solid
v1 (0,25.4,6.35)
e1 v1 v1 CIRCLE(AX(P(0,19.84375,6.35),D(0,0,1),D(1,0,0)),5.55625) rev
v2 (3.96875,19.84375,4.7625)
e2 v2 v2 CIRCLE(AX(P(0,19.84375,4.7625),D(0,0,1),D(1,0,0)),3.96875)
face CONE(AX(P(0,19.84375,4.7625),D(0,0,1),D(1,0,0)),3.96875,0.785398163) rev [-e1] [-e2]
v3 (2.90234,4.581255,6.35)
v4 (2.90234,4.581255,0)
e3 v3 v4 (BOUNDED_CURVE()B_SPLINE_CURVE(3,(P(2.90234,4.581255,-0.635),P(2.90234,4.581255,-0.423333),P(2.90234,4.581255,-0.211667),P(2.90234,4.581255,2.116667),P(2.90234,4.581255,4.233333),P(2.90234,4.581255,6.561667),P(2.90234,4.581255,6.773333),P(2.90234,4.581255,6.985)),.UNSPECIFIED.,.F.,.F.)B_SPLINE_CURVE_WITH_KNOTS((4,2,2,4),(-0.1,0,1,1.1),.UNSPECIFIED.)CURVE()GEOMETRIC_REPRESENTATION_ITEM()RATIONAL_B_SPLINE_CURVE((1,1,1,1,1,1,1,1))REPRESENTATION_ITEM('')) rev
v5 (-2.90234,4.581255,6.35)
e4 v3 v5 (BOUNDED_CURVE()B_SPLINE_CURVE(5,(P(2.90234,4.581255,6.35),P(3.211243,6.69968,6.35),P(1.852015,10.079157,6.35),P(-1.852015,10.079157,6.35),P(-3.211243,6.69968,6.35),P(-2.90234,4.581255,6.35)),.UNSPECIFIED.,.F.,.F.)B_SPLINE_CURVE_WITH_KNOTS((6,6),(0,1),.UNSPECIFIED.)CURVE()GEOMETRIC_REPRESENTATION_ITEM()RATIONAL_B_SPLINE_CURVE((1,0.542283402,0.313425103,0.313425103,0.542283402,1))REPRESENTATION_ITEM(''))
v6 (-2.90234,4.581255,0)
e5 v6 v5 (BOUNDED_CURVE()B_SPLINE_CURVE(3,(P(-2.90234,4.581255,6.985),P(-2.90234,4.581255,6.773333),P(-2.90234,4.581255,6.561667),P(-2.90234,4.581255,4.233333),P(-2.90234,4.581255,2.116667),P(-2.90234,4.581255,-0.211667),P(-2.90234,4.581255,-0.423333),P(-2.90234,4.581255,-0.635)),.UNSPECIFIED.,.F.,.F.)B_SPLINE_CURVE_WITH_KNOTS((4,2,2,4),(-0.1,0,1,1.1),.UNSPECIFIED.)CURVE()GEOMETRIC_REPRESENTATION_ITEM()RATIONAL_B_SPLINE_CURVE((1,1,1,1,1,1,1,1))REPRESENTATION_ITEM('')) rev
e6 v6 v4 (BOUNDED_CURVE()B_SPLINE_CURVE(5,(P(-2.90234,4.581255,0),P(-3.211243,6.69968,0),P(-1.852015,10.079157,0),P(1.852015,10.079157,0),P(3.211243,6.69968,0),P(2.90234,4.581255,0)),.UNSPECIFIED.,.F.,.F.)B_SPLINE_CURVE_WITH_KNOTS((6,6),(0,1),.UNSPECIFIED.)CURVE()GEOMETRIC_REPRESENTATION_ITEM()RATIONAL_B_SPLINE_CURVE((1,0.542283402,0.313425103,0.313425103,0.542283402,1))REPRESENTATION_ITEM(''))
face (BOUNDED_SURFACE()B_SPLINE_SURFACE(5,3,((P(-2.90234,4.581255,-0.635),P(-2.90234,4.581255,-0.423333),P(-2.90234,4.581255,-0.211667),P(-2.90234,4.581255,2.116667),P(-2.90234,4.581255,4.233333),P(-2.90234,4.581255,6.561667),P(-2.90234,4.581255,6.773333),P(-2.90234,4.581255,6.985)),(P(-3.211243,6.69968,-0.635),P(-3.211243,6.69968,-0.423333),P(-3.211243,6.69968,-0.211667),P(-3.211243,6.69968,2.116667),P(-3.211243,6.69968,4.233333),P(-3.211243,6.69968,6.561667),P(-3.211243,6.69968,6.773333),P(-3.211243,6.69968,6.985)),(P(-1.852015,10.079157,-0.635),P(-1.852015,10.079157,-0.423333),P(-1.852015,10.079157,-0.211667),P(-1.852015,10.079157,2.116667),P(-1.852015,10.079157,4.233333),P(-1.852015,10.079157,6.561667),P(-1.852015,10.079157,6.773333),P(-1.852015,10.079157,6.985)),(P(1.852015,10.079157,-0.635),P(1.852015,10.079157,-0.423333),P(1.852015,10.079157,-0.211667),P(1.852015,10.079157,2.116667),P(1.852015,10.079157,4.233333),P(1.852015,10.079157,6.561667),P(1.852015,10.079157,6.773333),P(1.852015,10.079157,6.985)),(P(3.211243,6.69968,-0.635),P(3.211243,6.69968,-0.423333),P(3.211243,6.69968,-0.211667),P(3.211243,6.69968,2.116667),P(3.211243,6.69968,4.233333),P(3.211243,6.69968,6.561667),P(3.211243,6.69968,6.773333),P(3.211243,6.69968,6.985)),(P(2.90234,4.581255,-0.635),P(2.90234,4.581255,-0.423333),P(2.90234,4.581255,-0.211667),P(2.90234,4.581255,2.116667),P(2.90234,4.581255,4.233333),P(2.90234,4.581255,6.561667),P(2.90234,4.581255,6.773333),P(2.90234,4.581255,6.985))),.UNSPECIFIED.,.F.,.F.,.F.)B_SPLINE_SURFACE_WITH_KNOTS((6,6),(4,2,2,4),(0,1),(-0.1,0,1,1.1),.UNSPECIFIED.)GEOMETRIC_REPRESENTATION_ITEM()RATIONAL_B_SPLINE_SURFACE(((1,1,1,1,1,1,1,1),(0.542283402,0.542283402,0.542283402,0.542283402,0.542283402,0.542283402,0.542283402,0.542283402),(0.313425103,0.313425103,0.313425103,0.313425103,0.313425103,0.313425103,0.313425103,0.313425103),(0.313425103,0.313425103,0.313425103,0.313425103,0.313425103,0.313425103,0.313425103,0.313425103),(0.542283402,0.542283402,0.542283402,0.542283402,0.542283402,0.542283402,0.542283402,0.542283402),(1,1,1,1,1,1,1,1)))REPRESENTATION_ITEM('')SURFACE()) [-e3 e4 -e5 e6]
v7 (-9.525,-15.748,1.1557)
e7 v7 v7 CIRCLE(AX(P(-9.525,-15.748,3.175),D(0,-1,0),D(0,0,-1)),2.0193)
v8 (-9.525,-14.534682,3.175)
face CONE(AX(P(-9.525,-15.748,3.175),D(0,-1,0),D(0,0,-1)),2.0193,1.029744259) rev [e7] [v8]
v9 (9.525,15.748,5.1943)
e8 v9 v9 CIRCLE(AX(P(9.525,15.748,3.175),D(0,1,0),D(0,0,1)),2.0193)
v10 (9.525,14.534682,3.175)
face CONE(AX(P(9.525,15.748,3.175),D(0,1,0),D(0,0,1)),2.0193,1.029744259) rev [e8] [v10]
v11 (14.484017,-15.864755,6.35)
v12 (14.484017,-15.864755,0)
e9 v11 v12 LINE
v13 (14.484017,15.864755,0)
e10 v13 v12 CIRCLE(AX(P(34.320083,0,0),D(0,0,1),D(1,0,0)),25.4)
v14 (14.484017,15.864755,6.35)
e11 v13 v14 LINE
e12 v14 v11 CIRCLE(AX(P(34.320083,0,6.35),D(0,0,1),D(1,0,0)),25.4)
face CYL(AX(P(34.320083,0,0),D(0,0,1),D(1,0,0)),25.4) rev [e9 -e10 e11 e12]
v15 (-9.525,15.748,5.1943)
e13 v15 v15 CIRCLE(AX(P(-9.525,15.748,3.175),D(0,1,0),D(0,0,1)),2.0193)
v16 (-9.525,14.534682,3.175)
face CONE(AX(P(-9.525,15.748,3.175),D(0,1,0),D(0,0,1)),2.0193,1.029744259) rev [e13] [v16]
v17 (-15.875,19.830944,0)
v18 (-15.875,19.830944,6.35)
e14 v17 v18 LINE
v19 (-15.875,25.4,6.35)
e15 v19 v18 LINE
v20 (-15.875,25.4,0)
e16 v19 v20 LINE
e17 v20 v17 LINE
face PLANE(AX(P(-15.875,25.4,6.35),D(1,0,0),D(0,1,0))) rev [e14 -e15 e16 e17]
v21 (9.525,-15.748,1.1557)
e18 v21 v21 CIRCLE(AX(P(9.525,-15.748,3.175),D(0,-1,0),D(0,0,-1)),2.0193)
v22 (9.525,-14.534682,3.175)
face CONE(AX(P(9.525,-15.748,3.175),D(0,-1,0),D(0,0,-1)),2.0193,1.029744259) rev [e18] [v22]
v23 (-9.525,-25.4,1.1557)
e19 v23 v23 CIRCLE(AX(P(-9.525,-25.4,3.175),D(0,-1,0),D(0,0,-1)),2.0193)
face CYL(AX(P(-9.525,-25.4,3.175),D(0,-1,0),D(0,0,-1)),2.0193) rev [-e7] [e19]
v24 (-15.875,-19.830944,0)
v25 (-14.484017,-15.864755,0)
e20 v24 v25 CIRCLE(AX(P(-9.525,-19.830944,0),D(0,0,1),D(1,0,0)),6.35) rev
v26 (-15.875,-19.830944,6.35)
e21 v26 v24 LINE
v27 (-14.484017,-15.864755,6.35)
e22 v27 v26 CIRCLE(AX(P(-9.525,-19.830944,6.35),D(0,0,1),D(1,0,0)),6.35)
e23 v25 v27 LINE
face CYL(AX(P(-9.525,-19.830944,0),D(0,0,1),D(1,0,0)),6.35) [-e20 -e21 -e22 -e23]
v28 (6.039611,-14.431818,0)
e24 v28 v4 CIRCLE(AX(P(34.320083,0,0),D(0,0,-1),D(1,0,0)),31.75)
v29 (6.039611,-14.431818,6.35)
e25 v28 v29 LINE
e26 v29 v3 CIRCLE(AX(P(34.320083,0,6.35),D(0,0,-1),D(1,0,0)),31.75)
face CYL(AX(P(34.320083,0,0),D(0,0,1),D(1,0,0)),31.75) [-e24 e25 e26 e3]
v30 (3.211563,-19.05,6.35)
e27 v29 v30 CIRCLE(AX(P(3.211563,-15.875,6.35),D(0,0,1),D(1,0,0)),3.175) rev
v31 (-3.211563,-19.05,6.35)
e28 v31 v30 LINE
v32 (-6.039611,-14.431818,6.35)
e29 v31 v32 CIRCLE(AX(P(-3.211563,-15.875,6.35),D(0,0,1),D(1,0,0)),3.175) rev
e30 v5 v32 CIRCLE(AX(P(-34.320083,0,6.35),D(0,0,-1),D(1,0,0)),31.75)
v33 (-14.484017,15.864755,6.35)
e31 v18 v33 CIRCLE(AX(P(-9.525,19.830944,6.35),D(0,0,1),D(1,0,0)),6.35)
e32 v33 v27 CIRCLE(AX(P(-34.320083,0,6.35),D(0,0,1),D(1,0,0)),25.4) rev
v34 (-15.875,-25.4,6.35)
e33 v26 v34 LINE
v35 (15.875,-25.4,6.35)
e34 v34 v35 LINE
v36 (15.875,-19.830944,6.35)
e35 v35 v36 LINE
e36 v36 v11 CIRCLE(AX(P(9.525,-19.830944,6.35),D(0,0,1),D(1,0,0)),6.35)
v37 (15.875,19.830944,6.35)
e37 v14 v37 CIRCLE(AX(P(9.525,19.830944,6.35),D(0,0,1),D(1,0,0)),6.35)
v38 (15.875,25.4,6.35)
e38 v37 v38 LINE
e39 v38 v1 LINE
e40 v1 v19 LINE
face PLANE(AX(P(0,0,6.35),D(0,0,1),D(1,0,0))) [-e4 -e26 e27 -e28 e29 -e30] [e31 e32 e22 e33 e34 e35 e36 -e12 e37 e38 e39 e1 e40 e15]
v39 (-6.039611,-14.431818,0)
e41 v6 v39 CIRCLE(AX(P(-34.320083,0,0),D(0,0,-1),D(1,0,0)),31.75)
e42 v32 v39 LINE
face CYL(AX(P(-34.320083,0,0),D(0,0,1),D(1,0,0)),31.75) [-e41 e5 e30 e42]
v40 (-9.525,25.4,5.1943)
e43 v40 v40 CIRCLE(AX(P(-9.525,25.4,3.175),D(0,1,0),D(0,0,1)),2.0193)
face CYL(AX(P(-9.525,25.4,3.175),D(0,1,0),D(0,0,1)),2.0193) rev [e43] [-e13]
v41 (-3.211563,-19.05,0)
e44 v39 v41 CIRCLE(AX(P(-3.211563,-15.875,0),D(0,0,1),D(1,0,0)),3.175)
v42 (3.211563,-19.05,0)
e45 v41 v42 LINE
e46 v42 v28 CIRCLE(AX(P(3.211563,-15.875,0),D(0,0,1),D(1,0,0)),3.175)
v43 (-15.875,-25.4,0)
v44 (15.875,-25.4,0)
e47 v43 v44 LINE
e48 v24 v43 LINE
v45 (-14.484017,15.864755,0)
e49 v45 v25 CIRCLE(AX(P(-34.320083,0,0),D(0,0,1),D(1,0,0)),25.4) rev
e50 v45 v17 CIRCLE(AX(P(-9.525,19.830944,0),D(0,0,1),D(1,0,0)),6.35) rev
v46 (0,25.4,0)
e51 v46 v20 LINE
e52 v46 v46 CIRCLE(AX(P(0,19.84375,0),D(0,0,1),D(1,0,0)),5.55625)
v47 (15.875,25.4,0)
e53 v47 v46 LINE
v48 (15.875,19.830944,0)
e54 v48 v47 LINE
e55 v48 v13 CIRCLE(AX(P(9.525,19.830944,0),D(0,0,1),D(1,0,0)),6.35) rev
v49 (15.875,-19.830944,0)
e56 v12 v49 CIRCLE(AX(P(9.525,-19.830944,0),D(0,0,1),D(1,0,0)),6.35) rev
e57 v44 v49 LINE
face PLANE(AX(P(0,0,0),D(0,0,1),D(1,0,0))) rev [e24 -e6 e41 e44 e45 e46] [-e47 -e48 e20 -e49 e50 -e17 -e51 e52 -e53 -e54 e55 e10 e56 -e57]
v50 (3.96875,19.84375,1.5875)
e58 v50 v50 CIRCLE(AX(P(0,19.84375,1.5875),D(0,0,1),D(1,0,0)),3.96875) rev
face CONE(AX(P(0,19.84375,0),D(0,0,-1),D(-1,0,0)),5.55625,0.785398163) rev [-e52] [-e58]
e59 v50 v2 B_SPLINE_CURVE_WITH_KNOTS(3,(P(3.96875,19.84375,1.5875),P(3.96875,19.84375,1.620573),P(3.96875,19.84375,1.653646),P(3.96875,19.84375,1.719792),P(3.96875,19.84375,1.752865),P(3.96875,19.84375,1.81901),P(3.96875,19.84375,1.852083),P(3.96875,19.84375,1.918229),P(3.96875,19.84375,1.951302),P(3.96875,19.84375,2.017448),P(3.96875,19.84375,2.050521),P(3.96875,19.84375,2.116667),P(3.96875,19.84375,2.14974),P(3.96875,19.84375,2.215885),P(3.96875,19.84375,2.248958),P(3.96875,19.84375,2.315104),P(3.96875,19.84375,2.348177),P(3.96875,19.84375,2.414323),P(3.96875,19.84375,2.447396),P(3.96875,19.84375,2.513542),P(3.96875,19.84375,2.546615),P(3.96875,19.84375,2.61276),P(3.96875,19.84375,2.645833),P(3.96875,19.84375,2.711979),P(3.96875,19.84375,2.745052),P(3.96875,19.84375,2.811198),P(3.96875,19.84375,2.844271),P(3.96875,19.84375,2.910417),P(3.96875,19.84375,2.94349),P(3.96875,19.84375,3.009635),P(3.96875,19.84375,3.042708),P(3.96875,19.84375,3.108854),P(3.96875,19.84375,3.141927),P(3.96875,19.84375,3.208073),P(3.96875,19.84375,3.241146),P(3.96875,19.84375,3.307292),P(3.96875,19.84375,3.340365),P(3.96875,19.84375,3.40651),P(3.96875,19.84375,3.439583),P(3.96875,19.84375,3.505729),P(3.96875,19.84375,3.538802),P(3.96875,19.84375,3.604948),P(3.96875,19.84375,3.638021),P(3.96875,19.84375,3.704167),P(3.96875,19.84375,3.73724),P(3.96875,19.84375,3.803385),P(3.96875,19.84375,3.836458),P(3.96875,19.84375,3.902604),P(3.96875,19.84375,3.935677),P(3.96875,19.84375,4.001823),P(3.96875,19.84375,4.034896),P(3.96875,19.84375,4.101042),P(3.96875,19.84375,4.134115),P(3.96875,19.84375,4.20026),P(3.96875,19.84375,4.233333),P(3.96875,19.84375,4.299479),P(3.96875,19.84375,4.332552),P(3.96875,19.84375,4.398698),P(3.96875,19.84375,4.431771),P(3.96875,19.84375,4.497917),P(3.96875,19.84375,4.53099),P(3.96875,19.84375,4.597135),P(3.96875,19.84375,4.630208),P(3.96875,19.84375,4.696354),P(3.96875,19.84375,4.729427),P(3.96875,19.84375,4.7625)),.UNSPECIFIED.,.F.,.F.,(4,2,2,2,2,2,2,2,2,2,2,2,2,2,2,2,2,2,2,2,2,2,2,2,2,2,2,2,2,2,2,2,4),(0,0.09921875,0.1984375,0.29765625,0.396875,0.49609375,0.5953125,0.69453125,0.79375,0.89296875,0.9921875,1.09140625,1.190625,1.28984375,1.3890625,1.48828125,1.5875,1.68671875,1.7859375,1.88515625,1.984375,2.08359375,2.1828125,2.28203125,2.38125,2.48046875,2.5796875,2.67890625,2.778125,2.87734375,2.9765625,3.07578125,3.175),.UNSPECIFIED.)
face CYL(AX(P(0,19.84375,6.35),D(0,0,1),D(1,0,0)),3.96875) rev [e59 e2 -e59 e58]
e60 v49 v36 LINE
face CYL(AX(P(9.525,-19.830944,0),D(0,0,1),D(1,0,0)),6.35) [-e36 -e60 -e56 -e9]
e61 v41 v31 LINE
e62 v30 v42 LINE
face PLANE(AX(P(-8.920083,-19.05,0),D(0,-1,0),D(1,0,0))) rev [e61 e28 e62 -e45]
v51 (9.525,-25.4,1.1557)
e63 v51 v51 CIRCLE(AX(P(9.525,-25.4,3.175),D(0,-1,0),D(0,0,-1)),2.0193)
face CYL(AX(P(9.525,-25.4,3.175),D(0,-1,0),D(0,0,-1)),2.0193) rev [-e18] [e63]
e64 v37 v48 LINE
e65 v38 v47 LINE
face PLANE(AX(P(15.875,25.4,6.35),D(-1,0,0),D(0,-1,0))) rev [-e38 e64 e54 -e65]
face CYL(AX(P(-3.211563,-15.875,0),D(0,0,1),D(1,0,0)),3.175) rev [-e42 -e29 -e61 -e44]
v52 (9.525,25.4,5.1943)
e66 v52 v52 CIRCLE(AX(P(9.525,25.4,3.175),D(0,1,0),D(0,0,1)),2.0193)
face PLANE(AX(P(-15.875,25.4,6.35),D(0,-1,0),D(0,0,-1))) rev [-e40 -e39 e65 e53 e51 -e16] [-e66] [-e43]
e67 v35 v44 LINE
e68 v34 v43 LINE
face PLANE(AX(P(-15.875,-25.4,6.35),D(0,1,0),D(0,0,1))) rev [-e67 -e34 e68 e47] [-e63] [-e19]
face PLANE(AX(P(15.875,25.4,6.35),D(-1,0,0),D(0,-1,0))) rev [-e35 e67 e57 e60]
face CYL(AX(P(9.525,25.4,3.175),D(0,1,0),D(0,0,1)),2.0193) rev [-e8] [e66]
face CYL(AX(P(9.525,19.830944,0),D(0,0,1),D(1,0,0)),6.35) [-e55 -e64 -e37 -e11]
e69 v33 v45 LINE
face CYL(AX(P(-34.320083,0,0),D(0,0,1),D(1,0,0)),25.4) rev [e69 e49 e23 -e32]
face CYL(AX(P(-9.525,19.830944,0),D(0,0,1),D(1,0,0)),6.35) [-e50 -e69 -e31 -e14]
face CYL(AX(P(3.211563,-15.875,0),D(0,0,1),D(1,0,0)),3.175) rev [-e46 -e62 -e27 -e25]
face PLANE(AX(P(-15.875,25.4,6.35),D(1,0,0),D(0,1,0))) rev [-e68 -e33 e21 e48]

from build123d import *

# Parameters (mm, degrees)
BOSS_EXTRUDE1_DEPTH                = 6.35
F_10_32_TAPPED_HOLE1_AT_2_COUNT    = 2
F_10_32_TAPPED_HOLE1_AT_2_PITCH    = 19.05
F_5_16_0_3125_DIAMETER_HOLE1_D     = 7.9375
F_5_16_0_3125_DIAMETER_HOLE1_DEPTH = 10.668
F_5_16_0_3125_DIAMETER_HOLE1_TIP   = 2.38466558176563
CHAMFER1_SIZE                      = 1.5875
CUT_EXTRUDE1_DEPTH                 = 31.61859116615264
FILLET1_R                          = 6.35
CUT_EXTRUDE2_DEPTH                 = 31.61859116615264
FILLET2_R                          = 3.175
FILLET3_DEPTH                      = 6.35


with BuildPart() as part:
    # Sketch1 → Boss-Extrude1 (new body)
    with BuildSketch(Plane.XY):
        Polygon((-15.875000000000007, 25.400000000000006), (15.874999999999993, 25.400000000000006), (15.875, -25.39999999999999), (-15.875, -25.39999999999999), align=None)
    extrude(amount=BOSS_EXTRUDE1_DEPTH)

    # Sketch3 → #10-32 Tapped Hole1 (revolve, cut)
    with BuildSketch(Plane(origin=(-9.525000000000007, 25.400000000000006, 3.175000000000004), x_dir=(0, 0, 1), z_dir=(1, 0, 0))):
        Polygon((0, 0), (-2.66e-15, 10.865317848002352), (2.0192999999999977, 9.652), (2.0192999999999985, 4e-17), align=None)
    f_10_32_tapped_hole1 = revolve(axis=Axis((-9.525000000000007, 31.749999999999996, 3.175000000000004), (0, -1, 0)), mode=Mode.SUBTRACT)

    # #10-32 Tapped Hole1 at 2: #10-32 Tapped Hole1 ×2
    with Locations(*[(i * F_10_32_TAPPED_HOLE1_AT_2_PITCH, 0, 0) for i in range(1, F_10_32_TAPPED_HOLE1_AT_2_COUNT)]):
        add(f_10_32_tapped_hole1, mode=Mode.SUBTRACT)

    # 5/16 (0.3125) Diameter Hole1
    with Locations(Plane.XY.offset(6.35)):
        with Locations((0, 19.84375)):
            Hole(F_5_16_0_3125_DIAMETER_HOLE1_D / 2, depth=F_5_16_0_3125_DIAMETER_HOLE1_DEPTH)
            with Locations((0, 0, -(F_5_16_0_3125_DIAMETER_HOLE1_DEPTH + F_5_16_0_3125_DIAMETER_HOLE1_TIP / 2))):  # 118° drill point
                Cone(0, F_5_16_0_3125_DIAMETER_HOLE1_D / 2, F_5_16_0_3125_DIAMETER_HOLE1_TIP, mode=Mode.SUBTRACT)

    # Chamfer1
    chamfer1_edges = [part.edges().sort_by_distance(p)[0] for p in [
        (3.96875, 19.84375, 0),
        (3.96875, 19.84375, 6.35),
    ]]
    chamfer(chamfer1_edges, length=CHAMFER1_SIZE)

    # Sketch6 → Cut-Extrude1 (cut, through all)
    with BuildSketch(Plane.XY.offset(6.35)):
        with BuildLine():
            Line((-15.875000000000007, 17.462500000000006), (-15.875000000000007, 3.55e-15))
            Line((-15.875000000000007, 3.39e-15), (-8.92008318631283, 4.67e-15))
            ThreePointArc((-8.920083186312826, 3.5971e-13), (-10.722783415657506, 9.398268113531895), (-15.875000000000007, 17.462500000000006))
        make_face()
        with BuildLine():
            Line((-8.92008318631283, 4.67e-15), (-15.875000000000007, 3.39e-15))
            Line((-15.875000000000007, 3.55e-15), (-15.875000000000007, -17.462500000000006))
            ThreePointArc((-15.87500000000001, -17.46250000000001), (-10.722783415657375, -9.39826811353156), (-8.920083186312826, 3.5971e-13))
        make_face()
        with BuildLine():
            ThreePointArc((15.875000000000004, 17.462499999999984), (10.722783415657386, 9.39826811353155), (8.920083186312844, -3.4461e-13))
            Line((8.920083186312851, 7.94e-15), (15.875, 9.22e-15))
            Line((15.875000000000004, 1.066e-14), (15.875000000000004, 17.462499999999984))
        make_face()
        with BuildLine():
            Line((15.875, 9.22e-15), (8.920083186312851, 7.94e-15))
            ThreePointArc((8.920083186312844, -3.4461e-13), (10.722783415657513, -9.398268113531874), (15.875, -17.462499999999984))
            Line((15.875000000000004, -17.462499999999984), (15.875000000000004, 1.066e-14))
        make_face()
    extrude(amount=-CUT_EXTRUDE1_DEPTH, mode=Mode.SUBTRACT)

    # Fillet1
    fillet1_edges = [part.edges().sort_by_distance(p)[0] for p in [
        (15.875000000000002, -17.462499999999984, 3.175),
        (15.875000000000004, 17.462499999999984, 3.175),
        (-15.875000000000009, -17.46250000000001, 3.175),
        (-15.875000000000005, 17.462500000000006, 3.175),
    ]]
    fillet(fillet1_edges, radius=FILLET1_R)

    # Sketch7 → Cut-Extrude2 (cut, through all)
    with BuildSketch(Plane.XY.offset(6.35)):
        with BuildLine():
            Line((-8.92008318631281, -19.04999999999999), (8.920083186312835, -19.049999999999986))
            ThreePointArc((8.920083186312835, -19.049999999999986), (3.1152594113270133, -5.858453138165378), (3.7402393989355516, 8.540237346795667))
            ThreePointArc((3.7402393989355516, 8.540237346795667), (6.02e-15, 7.937499999999989), (-3.740239398935539, 8.540237346795662))
            ThreePointArc((-3.740239398935539, 8.540237346795662), (-3.1152594113270027, -5.858453138165384), (-8.92008318631281, -19.04999999999999))
        make_face()
    extrude(amount=-CUT_EXTRUDE2_DEPTH, mode=Mode.SUBTRACT)

    # Fillet2
    fillet2_edges = [part.edges().sort_by_distance(p)[0] for p in [
        (8.920083186312837, -19.049999999999986, 3.175),
        (-8.920083186312809, -19.04999999999999, 3.175),
    ]]
    fillet(fillet2_edges, radius=FILLET2_R)

    # Mirror1: #10-32 Tapped Hole1 across plane
    add(f_10_32_tapped_hole1.mirror(Plane.ZX), mode=Mode.SUBTRACT)

    # Mirror1 copy 1 sketch → Mirror1 copy 1 (revolve, cut)
    with BuildSketch(Plane(origin=(9.524999999999993, -25.400000000000006, 3.175000000000004), x_dir=(0, 0, 1), z_dir=(1, 0, 0))):
        Polygon((0, 0), (-2.66e-15, -10.865317848002352), (2.0192999999999977, -9.652), (2.0192999999999985, -4e-17), align=None)
    revolve(axis=Axis((9.524999999999993, -31.749999999999996, 3.175000000000004), (0, -1, 0)), mode=Mode.SUBTRACT)

    # Fillet3: read off the stored shape, not the designer's step
    # Fillet3 outline → Fillet3 (add)
    with BuildSketch(Plane.XY):
        with BuildLine():
            ThreePointArc((-3.740239399, 8.540237347), (-3.258151648, 6.574108997), (-2.902339746, 4.581254969))
            add(Edge.make_bspline(
                [(-2.902339746, 4.581254969), (-3.0109534907888404, 5.326116105248684), (-2.9047701826802874, 6.25797221448604), (-2.3933426209054938, 7.245588905615834), (-1.356695523735085, 7.937499999999987), (0, 7.9375)],
                knots=[0, 0, 0, 0, 0, 0, 0.5, 0.5, 0.5, 0.5, 0.5, 0.5], degree=5, weights=[1, 0.7711417009817829, 0.5994979767181202, 0.48506882720901173, 0.4278542524544575, 0.4278542524544575]))
            ThreePointArc((0, 7.9375), (-1.894246762, 8.089150123), (-3.740239399, 8.540237347))
        make_face()
        with BuildLine():
            ThreePointArc((3.740239399, 8.540237347), (1.894246748, 8.089150121), (-1.5e-08, 7.9375))
            add(Edge.make_bspline(
                [(-1.5e-08, 7.9375), (1.3566955237351, 7.937499999999984), (2.393342620905507, 7.245588905615829), (2.904770182680299, 6.257972214486036), (3.01095349078885, 5.326116105248681), (2.902339746, 4.581254969)],
                knots=[0.5, 0.5, 0.5, 0.5, 0.5, 0.5, 1, 1, 1, 1, 1, 1], degree=5, weights=[0.4278542524544575, 0.4278542524544575, 0.48506882720901173, 0.5994979767181202, 0.7711417009817829, 1]))
            ThreePointArc((2.902339746, 4.581254969), (3.258151648, 6.574108997), (3.740239399, 8.540237347))
        make_face()
    extrude(amount=FILLET3_DEPTH)


solid = part.part
